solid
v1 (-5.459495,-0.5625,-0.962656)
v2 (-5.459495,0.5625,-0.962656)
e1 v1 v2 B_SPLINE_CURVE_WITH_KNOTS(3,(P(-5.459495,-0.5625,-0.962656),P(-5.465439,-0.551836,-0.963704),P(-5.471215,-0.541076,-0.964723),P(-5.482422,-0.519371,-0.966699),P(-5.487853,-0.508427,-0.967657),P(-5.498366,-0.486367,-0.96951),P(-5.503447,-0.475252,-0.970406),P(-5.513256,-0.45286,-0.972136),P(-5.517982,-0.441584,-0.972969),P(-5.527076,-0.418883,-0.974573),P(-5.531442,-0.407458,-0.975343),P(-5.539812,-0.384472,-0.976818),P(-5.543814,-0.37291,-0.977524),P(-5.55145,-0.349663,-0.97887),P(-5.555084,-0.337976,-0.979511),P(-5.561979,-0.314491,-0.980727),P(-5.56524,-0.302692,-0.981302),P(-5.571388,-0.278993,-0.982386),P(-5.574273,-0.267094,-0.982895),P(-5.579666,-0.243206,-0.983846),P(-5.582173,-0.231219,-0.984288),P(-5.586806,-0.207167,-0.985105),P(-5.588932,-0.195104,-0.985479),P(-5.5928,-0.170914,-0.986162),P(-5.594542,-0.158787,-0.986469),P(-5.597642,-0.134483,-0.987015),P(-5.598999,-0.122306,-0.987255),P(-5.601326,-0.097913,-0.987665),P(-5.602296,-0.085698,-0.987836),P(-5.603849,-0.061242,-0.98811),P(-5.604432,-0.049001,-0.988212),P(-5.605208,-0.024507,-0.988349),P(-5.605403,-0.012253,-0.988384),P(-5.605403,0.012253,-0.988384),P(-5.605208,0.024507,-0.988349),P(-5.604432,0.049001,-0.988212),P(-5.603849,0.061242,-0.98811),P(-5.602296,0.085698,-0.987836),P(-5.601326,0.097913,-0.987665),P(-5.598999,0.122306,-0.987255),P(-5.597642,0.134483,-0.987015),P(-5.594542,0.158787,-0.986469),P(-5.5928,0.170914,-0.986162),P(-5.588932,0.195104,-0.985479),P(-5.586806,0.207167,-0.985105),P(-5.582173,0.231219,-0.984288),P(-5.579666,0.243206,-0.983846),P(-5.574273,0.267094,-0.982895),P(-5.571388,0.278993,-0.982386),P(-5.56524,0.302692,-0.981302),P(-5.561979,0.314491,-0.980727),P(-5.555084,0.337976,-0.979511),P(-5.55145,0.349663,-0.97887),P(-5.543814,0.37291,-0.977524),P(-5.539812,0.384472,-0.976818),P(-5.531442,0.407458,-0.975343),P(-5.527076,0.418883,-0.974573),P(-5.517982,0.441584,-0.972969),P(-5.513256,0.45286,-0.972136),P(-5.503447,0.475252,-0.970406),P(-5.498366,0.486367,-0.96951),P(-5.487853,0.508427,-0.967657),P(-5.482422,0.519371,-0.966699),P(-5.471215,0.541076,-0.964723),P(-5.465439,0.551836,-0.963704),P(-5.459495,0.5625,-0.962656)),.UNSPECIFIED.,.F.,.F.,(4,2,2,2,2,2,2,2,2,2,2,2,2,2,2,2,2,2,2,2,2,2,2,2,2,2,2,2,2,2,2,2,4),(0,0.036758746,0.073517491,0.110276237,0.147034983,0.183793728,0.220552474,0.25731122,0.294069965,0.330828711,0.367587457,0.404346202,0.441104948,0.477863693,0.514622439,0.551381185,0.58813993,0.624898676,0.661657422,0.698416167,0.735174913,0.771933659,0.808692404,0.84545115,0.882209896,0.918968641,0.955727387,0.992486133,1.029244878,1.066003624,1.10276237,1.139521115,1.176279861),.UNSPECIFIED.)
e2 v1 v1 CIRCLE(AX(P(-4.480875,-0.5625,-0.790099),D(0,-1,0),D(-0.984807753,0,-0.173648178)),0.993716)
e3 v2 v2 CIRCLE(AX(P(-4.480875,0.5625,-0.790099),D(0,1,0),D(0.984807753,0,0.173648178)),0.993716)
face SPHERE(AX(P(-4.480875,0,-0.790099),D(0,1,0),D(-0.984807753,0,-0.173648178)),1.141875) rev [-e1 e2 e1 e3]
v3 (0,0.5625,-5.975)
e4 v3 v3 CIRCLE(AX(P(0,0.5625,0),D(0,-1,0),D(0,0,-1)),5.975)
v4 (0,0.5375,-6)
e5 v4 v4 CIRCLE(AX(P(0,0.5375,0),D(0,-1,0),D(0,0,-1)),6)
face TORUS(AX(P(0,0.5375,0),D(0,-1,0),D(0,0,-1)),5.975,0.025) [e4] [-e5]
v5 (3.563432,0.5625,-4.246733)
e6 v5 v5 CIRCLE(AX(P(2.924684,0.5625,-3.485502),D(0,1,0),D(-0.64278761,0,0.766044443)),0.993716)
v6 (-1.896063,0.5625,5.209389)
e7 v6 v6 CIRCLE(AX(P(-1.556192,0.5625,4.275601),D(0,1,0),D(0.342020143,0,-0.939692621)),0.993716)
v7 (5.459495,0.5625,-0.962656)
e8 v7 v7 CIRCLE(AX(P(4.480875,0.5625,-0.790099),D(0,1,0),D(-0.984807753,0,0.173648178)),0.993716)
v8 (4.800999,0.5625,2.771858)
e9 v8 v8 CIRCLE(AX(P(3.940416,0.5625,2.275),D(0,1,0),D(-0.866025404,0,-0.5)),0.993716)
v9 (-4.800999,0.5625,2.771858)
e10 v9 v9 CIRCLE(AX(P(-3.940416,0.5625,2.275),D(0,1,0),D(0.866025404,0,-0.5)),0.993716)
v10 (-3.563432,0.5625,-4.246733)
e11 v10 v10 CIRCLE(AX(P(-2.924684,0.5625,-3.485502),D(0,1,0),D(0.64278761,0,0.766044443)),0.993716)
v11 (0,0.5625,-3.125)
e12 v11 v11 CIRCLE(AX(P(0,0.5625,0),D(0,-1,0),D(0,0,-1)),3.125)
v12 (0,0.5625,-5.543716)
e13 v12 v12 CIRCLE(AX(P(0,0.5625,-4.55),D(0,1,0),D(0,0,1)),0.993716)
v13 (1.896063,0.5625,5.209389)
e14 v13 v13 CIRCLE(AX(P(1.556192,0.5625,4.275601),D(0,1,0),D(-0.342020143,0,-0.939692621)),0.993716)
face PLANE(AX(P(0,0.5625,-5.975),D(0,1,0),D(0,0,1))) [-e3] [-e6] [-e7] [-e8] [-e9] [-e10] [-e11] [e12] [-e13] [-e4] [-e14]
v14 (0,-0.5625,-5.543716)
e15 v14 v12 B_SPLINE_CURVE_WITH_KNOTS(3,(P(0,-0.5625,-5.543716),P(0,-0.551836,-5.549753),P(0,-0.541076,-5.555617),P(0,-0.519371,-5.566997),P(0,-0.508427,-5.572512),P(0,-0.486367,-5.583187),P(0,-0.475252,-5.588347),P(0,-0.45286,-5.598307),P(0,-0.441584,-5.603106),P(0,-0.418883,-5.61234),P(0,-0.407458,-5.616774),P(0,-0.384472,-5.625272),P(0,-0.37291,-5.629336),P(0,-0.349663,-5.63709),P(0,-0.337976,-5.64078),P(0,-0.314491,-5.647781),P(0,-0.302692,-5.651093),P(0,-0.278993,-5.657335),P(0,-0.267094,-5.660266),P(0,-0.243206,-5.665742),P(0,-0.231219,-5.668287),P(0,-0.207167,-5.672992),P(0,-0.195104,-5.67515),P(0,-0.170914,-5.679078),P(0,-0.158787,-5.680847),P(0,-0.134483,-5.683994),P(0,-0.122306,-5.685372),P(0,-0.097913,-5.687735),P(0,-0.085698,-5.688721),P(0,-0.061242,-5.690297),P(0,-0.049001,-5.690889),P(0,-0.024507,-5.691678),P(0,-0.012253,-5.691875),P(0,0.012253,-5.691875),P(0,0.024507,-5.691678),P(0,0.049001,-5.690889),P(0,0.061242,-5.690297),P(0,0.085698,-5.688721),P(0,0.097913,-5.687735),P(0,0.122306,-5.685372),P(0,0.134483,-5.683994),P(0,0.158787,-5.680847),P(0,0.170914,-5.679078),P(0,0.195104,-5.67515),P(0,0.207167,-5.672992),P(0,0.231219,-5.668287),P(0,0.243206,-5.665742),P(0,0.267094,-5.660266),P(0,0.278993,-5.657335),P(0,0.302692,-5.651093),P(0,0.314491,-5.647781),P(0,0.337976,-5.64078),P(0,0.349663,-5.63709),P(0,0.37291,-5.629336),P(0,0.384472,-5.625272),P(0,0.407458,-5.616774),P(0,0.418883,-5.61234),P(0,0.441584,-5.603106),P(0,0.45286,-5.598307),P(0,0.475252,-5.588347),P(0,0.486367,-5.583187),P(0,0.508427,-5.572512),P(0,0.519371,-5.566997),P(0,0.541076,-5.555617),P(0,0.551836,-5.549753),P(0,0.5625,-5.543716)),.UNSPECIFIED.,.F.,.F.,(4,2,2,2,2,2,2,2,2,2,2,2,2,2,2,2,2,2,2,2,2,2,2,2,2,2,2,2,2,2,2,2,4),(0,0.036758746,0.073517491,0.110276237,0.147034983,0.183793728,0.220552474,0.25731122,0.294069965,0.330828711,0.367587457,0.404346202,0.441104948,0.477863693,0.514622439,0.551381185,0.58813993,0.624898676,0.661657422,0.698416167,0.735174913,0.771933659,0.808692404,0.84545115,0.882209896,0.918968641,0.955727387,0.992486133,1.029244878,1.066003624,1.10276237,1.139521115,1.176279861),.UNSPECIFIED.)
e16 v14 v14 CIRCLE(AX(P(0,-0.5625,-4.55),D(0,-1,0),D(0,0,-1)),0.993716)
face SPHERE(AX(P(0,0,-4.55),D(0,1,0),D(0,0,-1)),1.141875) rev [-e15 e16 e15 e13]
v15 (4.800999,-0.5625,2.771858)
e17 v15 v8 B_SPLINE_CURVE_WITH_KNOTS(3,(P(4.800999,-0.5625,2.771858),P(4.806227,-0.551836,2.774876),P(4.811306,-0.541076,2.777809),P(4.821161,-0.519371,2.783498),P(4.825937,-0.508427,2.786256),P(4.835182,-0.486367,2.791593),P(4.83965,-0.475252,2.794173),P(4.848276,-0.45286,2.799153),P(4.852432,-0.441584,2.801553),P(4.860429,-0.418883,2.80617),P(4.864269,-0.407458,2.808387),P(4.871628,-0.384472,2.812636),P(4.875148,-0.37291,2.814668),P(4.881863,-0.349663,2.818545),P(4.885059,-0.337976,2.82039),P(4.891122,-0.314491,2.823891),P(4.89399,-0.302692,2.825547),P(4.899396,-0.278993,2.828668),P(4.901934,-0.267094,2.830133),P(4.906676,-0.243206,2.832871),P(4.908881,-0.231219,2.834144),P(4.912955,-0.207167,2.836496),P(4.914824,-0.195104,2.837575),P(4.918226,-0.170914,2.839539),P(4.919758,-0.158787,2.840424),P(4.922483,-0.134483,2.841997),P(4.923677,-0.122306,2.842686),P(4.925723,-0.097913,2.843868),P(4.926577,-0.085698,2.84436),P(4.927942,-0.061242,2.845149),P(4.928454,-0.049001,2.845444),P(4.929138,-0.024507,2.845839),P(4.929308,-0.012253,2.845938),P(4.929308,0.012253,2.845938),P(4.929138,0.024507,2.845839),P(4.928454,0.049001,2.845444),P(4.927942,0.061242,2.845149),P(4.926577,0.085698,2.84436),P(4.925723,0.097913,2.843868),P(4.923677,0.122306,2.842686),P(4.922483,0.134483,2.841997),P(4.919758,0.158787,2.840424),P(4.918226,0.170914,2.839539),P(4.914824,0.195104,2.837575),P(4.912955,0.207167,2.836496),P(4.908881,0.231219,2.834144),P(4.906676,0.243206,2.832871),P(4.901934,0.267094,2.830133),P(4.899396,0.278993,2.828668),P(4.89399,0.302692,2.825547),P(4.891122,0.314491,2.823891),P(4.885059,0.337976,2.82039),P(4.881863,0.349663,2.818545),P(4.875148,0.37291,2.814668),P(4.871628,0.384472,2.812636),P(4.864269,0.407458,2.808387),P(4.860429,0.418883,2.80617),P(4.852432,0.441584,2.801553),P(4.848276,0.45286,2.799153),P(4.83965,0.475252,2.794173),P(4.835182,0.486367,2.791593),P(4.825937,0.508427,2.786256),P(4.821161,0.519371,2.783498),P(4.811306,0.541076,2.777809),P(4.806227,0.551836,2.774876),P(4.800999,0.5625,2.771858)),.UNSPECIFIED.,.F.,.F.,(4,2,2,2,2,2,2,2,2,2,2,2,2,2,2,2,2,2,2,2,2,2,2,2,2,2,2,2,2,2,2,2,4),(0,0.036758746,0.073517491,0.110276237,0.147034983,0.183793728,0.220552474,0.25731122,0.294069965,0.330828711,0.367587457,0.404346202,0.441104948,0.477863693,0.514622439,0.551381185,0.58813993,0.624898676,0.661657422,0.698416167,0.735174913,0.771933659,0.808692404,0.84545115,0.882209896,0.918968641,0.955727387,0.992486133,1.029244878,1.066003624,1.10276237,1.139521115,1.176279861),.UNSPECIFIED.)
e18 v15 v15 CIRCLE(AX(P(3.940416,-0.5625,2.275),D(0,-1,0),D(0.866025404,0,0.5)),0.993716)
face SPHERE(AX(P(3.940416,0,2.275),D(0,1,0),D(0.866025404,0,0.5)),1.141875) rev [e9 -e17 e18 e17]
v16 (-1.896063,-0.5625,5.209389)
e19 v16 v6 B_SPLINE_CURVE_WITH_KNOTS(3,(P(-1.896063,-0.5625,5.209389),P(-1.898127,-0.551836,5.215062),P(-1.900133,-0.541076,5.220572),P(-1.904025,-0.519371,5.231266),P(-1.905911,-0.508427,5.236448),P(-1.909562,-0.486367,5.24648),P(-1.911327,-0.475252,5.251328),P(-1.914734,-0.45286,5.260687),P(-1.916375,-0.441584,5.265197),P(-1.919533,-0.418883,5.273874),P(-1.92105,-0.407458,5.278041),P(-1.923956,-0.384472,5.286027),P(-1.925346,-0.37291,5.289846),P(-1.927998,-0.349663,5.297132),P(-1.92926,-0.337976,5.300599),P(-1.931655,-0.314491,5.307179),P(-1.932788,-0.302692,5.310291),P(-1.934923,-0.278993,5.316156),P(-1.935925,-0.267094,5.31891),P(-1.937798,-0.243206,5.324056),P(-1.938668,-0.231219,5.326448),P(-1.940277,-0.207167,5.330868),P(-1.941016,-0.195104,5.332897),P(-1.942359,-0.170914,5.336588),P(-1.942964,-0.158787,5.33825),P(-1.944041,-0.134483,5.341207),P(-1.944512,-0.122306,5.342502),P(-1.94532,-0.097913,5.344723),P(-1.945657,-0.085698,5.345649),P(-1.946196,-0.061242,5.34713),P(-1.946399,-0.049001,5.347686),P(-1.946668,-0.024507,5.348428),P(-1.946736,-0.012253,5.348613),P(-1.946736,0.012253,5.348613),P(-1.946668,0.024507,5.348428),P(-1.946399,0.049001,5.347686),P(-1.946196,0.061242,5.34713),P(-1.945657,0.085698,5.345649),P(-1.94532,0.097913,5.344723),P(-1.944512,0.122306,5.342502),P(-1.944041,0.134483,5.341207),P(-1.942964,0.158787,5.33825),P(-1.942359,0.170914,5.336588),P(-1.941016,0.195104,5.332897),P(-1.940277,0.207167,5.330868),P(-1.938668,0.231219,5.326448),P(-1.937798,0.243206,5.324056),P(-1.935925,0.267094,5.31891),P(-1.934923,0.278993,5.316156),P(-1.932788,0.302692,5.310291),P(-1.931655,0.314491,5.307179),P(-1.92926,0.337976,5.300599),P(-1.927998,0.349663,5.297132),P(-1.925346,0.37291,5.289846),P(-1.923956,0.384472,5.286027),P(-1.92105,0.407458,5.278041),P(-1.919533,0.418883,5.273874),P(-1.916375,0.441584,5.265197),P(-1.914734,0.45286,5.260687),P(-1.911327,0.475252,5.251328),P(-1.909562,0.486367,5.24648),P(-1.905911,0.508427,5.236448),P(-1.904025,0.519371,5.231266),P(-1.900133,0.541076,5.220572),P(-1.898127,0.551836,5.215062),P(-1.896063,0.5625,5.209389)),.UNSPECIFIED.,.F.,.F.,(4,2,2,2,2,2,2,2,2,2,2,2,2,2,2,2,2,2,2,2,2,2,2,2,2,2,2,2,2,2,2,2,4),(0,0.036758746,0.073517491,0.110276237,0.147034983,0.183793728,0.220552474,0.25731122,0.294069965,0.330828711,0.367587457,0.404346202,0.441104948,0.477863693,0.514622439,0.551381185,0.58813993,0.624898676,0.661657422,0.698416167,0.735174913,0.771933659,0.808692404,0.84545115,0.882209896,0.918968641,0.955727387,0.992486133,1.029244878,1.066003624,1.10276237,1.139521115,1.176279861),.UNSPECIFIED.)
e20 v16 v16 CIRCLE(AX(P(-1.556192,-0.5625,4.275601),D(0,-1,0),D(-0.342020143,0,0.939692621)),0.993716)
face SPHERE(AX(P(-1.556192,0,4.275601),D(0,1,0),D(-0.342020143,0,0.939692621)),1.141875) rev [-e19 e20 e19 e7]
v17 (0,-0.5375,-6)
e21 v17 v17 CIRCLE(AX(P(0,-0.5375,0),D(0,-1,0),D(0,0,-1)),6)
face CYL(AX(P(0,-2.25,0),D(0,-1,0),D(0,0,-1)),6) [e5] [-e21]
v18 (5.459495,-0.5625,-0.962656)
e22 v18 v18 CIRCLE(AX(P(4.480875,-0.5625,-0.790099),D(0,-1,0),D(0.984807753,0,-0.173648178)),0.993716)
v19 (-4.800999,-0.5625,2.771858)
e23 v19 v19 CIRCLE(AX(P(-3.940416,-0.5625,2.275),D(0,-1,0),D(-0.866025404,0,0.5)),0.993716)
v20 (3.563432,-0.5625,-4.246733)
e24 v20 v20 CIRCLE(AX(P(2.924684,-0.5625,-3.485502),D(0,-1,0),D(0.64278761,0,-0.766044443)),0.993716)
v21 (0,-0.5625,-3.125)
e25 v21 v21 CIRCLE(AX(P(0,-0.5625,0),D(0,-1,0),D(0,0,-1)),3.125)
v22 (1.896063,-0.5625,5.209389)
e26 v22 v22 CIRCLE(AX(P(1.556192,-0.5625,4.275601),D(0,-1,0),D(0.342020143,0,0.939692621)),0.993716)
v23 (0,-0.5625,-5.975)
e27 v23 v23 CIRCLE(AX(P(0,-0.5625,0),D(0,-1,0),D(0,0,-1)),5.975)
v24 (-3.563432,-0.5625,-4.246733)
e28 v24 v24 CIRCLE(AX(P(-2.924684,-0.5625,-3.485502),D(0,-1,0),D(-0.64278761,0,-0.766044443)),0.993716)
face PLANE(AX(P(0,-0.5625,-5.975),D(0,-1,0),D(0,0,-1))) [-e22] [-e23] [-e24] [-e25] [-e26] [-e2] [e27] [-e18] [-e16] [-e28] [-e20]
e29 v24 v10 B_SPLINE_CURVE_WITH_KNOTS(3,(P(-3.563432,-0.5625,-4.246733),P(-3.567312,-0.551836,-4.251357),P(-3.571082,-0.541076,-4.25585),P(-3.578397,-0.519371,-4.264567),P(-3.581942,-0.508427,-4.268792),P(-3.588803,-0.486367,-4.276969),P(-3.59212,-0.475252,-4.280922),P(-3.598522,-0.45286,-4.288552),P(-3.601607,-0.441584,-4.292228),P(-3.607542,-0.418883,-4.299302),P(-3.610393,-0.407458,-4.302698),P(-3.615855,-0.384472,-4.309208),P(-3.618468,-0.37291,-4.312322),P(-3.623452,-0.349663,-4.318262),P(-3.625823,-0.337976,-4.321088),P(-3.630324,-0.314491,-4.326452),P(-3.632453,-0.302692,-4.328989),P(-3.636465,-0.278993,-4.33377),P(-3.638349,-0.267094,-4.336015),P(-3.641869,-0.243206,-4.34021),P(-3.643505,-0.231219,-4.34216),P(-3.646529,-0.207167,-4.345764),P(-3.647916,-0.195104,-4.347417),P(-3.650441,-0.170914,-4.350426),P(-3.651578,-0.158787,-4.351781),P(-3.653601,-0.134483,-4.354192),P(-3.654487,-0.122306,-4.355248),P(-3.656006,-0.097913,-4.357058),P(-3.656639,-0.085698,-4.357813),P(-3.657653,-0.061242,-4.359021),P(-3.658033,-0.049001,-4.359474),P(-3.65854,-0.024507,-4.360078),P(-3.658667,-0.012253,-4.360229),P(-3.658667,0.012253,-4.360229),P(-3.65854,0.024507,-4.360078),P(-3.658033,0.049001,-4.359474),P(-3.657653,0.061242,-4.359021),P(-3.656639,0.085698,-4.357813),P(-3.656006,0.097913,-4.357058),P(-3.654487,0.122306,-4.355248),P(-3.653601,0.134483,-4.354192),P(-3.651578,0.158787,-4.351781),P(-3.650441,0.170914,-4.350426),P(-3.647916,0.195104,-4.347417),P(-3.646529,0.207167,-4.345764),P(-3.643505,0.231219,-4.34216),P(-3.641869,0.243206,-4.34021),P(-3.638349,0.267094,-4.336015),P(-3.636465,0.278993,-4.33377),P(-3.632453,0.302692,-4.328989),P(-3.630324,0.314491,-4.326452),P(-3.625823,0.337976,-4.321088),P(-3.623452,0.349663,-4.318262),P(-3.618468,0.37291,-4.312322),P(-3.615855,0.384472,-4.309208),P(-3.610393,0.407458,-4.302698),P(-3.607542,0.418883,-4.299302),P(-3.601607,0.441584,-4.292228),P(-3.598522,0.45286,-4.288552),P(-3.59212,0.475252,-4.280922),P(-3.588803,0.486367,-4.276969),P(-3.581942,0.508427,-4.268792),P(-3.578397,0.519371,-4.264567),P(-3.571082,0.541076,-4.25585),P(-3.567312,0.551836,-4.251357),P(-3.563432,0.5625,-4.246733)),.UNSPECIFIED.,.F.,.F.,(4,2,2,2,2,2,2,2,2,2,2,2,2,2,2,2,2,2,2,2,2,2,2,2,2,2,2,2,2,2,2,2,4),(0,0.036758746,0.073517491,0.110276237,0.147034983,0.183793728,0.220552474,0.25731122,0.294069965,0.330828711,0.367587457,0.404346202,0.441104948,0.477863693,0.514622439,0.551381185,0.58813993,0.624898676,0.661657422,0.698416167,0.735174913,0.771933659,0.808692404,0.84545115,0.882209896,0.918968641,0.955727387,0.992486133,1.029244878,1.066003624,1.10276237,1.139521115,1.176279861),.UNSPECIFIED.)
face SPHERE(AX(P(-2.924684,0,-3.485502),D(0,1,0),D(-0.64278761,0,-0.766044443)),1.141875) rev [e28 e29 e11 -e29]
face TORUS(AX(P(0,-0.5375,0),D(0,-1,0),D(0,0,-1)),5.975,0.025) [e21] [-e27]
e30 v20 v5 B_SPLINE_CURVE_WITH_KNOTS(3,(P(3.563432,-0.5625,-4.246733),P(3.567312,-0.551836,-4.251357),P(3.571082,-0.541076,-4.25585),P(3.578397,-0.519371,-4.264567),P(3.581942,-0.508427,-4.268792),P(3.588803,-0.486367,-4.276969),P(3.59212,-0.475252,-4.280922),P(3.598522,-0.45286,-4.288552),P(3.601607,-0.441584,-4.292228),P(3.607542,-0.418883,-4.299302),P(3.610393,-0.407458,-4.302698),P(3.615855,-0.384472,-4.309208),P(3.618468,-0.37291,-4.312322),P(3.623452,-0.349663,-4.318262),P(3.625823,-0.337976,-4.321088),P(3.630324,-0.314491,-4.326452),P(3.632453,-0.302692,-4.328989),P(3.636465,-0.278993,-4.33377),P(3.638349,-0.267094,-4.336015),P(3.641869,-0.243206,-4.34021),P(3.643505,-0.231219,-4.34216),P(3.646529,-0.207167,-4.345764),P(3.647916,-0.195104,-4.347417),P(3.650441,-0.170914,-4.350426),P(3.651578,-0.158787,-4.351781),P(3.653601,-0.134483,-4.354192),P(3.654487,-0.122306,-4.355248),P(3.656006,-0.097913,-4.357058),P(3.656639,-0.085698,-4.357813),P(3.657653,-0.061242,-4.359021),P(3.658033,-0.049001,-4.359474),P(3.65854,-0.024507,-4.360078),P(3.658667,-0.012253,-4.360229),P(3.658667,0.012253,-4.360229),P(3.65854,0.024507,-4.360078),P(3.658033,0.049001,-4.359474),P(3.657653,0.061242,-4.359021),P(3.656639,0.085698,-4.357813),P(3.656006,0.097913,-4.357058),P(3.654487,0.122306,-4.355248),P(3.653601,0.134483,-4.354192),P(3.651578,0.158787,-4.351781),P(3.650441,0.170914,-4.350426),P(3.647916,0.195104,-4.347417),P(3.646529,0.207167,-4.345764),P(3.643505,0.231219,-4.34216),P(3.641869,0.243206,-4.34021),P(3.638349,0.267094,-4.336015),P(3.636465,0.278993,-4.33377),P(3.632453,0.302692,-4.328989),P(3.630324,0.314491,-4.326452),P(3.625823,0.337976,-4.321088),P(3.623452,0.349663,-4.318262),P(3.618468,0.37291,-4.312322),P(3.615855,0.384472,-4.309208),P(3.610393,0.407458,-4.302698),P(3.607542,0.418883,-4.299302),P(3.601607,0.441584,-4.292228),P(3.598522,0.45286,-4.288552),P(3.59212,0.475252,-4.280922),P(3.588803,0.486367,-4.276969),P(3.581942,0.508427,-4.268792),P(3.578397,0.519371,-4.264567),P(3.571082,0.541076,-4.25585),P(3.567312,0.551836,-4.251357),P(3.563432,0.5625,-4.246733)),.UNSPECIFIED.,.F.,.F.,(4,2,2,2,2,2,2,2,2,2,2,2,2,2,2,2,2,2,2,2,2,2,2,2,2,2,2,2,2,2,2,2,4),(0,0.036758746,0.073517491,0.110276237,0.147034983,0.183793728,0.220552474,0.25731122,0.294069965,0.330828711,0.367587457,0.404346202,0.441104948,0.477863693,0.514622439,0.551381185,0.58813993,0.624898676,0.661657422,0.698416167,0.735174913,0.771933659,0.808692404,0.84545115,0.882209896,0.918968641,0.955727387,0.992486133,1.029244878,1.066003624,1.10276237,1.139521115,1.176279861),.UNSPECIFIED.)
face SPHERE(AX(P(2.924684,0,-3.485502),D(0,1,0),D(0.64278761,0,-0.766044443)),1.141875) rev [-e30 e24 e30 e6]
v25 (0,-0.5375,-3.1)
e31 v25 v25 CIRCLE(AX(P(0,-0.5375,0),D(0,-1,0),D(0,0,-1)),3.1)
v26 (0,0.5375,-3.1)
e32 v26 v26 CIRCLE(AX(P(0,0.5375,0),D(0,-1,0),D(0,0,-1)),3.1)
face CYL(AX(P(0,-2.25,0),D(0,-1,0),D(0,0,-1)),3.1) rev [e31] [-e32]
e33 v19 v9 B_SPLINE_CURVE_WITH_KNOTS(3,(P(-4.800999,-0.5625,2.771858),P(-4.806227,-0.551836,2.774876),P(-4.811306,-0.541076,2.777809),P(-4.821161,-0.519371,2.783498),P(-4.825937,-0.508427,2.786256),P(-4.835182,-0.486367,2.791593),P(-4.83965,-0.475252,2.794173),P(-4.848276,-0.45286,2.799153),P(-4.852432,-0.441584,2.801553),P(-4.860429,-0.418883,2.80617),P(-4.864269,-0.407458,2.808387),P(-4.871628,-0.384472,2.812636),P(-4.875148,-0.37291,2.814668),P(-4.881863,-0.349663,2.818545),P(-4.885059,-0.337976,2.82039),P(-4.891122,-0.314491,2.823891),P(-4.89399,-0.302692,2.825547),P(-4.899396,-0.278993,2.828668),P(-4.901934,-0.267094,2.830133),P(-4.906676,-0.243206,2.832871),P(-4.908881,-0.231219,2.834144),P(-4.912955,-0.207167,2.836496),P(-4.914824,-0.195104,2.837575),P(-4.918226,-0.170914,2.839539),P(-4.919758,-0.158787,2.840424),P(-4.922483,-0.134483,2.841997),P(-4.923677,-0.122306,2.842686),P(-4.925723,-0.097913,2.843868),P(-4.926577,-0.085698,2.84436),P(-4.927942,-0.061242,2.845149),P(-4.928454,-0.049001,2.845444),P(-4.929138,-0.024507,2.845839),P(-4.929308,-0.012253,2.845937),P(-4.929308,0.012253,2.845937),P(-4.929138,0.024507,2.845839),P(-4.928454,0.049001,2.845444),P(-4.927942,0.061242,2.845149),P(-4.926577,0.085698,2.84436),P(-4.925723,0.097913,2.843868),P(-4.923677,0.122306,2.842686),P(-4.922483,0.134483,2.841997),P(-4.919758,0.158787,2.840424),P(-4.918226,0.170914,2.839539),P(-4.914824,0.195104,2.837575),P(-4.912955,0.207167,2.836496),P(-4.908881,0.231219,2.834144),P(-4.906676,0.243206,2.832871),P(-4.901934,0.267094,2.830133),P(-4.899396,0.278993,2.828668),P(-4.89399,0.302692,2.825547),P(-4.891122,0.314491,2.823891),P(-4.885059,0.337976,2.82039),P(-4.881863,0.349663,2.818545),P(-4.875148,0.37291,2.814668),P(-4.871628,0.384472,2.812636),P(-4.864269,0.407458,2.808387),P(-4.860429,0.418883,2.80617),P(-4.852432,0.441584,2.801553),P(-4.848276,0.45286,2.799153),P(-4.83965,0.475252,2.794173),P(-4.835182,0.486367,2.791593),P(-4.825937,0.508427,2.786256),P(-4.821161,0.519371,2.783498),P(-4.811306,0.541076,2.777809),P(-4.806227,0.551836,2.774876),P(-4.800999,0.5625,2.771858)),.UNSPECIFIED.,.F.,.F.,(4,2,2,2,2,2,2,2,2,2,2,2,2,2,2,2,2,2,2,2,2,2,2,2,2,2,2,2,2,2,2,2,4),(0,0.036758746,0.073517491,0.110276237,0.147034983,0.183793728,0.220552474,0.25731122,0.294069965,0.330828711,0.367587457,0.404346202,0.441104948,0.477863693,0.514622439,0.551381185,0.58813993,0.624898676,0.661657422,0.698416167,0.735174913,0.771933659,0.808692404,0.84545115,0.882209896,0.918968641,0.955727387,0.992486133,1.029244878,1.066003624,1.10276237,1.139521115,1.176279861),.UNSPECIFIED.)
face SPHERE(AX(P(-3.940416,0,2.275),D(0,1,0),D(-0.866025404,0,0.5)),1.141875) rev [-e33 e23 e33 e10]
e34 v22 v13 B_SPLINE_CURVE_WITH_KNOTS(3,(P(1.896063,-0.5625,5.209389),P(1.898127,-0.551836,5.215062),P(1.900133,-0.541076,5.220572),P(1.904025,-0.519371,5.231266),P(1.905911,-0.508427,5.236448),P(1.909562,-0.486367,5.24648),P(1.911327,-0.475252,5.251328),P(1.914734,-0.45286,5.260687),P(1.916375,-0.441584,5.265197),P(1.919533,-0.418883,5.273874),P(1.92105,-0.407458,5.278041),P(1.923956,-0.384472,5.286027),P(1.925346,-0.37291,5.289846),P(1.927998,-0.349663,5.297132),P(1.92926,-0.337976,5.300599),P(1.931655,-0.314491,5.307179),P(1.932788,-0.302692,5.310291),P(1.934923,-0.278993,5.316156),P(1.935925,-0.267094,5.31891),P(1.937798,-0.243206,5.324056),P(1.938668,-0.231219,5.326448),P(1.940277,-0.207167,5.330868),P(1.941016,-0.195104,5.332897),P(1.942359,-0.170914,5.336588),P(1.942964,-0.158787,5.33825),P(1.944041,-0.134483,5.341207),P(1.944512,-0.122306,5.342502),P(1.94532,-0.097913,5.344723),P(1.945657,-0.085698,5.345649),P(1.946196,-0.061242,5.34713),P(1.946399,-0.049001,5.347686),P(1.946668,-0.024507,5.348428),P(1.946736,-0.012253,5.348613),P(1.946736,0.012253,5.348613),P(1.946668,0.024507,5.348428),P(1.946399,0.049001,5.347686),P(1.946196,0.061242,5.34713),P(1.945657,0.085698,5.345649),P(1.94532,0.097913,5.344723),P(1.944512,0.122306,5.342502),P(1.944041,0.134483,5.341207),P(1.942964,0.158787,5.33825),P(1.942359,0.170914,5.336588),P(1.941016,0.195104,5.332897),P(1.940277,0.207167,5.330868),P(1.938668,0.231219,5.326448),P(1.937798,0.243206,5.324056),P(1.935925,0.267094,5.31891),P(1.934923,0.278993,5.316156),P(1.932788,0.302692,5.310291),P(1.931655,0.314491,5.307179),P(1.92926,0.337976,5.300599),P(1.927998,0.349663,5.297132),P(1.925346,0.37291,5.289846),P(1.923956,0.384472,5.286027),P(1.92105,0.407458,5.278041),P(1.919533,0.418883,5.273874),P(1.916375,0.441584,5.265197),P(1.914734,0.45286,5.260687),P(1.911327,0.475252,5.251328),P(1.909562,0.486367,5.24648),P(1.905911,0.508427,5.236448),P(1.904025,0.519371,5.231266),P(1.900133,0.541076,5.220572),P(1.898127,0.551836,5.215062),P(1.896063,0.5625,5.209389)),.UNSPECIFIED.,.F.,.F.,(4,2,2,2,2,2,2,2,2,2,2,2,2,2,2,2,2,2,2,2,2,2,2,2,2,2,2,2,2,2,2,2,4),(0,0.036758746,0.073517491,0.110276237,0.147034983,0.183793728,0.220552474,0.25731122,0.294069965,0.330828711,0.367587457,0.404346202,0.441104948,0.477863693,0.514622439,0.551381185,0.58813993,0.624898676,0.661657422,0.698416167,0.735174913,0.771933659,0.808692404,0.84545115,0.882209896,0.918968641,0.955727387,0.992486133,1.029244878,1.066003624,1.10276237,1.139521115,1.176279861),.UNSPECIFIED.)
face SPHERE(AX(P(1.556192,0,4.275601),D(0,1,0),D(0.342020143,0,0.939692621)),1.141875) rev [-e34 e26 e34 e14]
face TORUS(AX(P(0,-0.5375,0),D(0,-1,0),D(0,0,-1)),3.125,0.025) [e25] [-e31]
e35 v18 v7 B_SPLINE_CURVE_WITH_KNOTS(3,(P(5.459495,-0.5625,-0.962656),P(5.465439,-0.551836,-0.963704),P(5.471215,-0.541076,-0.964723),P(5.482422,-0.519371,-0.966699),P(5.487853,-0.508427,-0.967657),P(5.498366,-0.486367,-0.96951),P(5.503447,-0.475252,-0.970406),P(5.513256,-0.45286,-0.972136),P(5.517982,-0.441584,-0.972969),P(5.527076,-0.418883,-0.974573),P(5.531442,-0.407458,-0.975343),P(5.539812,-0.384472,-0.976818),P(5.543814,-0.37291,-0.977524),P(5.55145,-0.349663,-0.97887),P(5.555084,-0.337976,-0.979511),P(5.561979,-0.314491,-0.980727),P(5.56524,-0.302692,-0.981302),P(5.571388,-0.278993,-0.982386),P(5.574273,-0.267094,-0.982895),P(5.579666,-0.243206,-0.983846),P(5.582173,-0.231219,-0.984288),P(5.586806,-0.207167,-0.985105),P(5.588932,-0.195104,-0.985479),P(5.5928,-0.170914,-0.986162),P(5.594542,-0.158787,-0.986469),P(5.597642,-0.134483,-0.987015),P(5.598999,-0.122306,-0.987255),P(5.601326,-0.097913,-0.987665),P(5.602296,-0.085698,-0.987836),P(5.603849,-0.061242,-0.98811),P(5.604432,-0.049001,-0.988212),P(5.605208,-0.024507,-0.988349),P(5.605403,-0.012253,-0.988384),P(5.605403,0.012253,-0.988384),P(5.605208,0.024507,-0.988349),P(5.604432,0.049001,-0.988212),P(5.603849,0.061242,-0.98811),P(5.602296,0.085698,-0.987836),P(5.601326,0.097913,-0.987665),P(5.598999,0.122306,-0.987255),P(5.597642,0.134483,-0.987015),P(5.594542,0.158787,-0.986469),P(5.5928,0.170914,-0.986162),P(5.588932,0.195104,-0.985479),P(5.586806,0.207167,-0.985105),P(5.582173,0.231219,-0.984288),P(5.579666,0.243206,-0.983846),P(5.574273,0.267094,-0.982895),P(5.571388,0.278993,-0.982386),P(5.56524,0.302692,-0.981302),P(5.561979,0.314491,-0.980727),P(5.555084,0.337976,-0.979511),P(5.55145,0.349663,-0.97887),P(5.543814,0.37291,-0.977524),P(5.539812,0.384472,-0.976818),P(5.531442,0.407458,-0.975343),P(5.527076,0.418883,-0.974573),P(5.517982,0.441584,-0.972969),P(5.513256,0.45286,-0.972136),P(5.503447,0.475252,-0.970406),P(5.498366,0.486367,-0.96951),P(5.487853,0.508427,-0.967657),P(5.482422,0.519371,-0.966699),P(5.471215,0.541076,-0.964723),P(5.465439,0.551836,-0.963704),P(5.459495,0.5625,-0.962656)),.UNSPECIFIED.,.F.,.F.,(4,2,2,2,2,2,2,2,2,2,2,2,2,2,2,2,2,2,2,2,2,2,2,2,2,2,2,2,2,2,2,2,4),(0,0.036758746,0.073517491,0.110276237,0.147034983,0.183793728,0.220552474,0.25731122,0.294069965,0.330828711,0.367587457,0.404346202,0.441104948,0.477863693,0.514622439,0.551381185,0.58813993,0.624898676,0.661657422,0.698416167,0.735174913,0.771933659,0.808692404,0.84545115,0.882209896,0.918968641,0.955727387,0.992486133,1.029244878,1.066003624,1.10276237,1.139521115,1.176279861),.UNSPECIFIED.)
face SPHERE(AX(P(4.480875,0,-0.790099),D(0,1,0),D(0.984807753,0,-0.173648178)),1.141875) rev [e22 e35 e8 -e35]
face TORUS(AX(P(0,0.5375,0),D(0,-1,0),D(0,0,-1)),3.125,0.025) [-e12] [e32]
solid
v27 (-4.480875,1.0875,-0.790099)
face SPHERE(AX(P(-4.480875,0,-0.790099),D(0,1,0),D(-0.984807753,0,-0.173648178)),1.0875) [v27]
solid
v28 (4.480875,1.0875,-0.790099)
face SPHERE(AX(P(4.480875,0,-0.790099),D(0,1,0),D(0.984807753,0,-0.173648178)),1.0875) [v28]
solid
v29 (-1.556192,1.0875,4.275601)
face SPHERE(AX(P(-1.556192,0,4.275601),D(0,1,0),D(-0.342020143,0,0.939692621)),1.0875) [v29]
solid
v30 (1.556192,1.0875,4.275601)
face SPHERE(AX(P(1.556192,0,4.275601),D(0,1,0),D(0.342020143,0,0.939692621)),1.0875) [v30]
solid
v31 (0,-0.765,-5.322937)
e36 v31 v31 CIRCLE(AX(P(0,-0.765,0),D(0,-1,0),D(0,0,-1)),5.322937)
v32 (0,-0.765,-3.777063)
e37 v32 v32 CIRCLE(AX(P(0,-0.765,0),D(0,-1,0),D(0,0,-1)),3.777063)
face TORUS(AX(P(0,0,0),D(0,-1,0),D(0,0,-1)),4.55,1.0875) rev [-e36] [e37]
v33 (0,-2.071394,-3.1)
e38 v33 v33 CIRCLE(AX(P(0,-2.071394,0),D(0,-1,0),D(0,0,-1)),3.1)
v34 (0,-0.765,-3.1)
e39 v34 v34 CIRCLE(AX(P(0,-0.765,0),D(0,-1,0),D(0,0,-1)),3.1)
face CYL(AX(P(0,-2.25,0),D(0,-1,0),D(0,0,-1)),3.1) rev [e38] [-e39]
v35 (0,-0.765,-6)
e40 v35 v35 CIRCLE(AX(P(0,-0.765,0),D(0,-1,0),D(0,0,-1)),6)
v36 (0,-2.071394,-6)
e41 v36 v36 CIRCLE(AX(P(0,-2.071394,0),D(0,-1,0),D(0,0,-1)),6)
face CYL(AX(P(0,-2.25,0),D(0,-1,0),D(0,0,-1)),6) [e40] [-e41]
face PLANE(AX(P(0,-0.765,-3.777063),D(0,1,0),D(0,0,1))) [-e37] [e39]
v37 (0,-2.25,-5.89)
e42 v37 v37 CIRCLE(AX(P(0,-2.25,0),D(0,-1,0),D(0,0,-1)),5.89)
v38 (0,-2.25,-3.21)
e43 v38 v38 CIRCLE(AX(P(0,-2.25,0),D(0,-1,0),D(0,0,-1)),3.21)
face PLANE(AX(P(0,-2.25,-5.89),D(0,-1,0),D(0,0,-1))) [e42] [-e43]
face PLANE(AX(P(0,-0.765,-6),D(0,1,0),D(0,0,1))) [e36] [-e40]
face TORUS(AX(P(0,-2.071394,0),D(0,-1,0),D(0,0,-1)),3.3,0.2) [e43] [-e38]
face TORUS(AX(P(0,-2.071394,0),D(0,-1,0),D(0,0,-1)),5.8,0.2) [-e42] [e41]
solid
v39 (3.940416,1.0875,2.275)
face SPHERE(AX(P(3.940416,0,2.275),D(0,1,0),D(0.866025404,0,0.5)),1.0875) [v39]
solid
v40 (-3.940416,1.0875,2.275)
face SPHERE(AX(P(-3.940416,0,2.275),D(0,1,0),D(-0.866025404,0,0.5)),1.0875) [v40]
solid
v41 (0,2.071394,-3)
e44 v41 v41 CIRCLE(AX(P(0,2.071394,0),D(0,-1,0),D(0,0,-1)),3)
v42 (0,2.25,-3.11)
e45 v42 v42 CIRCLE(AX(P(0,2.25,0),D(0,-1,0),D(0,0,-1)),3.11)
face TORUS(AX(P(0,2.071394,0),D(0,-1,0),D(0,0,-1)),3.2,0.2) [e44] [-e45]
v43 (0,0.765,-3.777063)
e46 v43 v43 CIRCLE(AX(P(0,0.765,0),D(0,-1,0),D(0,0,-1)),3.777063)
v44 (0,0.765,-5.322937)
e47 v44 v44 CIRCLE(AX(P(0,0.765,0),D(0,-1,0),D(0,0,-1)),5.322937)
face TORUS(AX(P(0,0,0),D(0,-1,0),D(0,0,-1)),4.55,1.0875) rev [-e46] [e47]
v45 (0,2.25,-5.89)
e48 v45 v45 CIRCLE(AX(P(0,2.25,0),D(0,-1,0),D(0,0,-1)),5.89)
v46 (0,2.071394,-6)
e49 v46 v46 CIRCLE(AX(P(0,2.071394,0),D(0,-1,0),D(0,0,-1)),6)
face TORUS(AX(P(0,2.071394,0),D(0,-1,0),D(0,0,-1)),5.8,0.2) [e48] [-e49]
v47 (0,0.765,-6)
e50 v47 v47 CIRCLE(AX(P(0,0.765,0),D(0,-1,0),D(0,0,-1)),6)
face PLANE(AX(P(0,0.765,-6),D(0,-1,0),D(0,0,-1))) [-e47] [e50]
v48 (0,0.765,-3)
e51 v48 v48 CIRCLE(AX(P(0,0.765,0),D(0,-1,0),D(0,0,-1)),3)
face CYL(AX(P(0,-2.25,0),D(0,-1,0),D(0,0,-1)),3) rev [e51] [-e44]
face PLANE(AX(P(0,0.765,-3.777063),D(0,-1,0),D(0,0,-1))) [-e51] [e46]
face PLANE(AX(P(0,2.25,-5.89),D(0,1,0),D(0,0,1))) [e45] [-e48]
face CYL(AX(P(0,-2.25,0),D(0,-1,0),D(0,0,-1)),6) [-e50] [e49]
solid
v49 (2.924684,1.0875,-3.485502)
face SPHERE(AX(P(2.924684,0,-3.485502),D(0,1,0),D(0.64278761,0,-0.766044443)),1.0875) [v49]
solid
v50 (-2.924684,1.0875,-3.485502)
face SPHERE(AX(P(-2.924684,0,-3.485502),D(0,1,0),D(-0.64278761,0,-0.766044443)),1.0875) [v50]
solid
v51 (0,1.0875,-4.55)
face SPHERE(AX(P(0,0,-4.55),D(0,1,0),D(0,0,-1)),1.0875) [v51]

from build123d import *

# Parameters (mm, degrees)
CIRPATTERN1_COUNT = 9
CIRPATTERN2_COUNT = 9


# Read off the part's stored shape, not the designer's step: Cut-Revolve1
with BuildPart() as part:
    # Sketch3 → Revolve1 (revolve)
    with BuildSketch(Plane(origin=(0, 0, 0), x_dir=(0, 0, -1), z_dir=(1, 0, 0))):
        with BuildLine():
            Line((6, 0.765), (5.32293677, 0.765))
            ThreePointArc((5.32293677, 0.765), (4.55, 1.0875), (3.77706323, 0.765))
            Line((3.77706323, 0.765), (3, 0.765))
            Line((3, 0.765), (3, 2.071394289))
            ThreePointArc((3, 2.071394289), (3.029706136, 2.176275174), (3.11, 2.25))
            Line((3.11, 2.25), (5.89, 2.25))
            ThreePointArc((5.89, 2.25), (5.970293864, 2.176275174), (6, 2.071394289))
            Line((6, 2.071394289), (6, 0.765))
        make_face()
        with BuildLine():
            Line((3.77706323, -0.765), (3.1, -0.765))
            Line((3.1, -0.765), (3.1, -2.071394289))
            ThreePointArc((3.1, -2.071394289), (3.129706136, -2.176275174), (3.21, -2.25))
            Line((3.21, -2.25), (5.89, -2.25))
            ThreePointArc((5.89, -2.25), (5.970293864, -2.176275174), (6, -2.071394289))
            Line((6, -2.071394289), (6, -0.765))
            Line((6, -0.765), (5.32293677, -0.765))
            ThreePointArc((5.32293677, -0.765), (4.55, -1.0875), (3.77706323, -0.765))
        make_face()
        with BuildLine():
            Line((5.975, 0.5625), (3.125, 0.5625))
            ThreePointArc((3.125, 0.5625), (3.10732233, 0.55517767), (3.1, 0.5375))
            Line((3.1, 0.5375), (3.1, -0.5375))
            ThreePointArc((3.1, -0.5375), (3.10732233, -0.55517767), (3.125, -0.5625))
            Line((3.125, -0.5625), (5.975, -0.5625))
            ThreePointArc((5.975, -0.5625), (5.99267767, -0.55517767), (6, -0.5375))
            Line((6, -0.5375), (6, 0.5375))
            ThreePointArc((6, 0.5375), (5.99267767, 0.55517767), (5.975, 0.5625))
        make_face()
    revolve(axis=Axis((0, -2.25, 0), (0, 1, 0)))

    # Cut-Revolve1 outline → Cut-Revolve1 (revolve, cut)
    with BuildSketch(Plane.XY.offset(-4.55)):
        with BuildLine():
            Line((0.99371639, 0.562500001), (0, 0.562500001))
            Line((0, 0.562500001), (0, -0.562500001))
            Line((0, -0.562500001), (0.99371639, -0.562500001))
            ThreePointArc((0.99371639, -0.562500001), (1.141875, 0), (0.99371639, 0.562500001))
        make_face()
    cut_revolve1 = revolve(axis=Axis((0, 0, -4.55), (0, 1, 0)), mode=Mode.SUBTRACT)

    # CirPattern2: Cut-Revolve1 ×9 about axis
    cirpattern2_axis = Axis((0, 0, 0), (0, 1, 0))
    for i in range(1, CIRPATTERN2_COUNT):
        add(cut_revolve1.rotate(cirpattern2_axis, i * 360 / CIRPATTERN2_COUNT), mode=Mode.SUBTRACT)


with BuildPart() as body_2:
    # Sketch4 → Revolve2 (revolve)
    with BuildSketch(Plane(origin=(0, 0, 0), x_dir=(0, 0, -1), z_dir=(1, 0, 0))):
        with BuildLine():
            Line((4.55, -1.0875), (4.55, 1.0875))
            ThreePointArc((4.55, 1.0875), (3.4625, 0), (4.55, -1.0875))
        make_face()
    revolve(axis=Axis((0, 2.25, -4.55), (0, -1, 0)))


with BuildPart() as cirpattern1_1:
    # CirPattern1: pattern copy
    add(body_2.part.rotate(Axis((0, 0, 0), (0, 1, 0)), 1 * 360 / CIRPATTERN1_COUNT))


with BuildPart() as cirpattern1_2:
    # CirPattern1: pattern copy
    add(body_2.part.rotate(Axis((0, 0, 0), (0, 1, 0)), 2 * 360 / CIRPATTERN1_COUNT))


with BuildPart() as cirpattern1_3:
    # CirPattern1: pattern copy
    add(body_2.part.rotate(Axis((0, 0, 0), (0, 1, 0)), 3 * 360 / CIRPATTERN1_COUNT))


with BuildPart() as cirpattern1_4:
    # CirPattern1: pattern copy
    add(body_2.part.rotate(Axis((0, 0, 0), (0, 1, 0)), 4 * 360 / CIRPATTERN1_COUNT))


with BuildPart() as cirpattern1_5:
    # CirPattern1: pattern copy
    add(body_2.part.rotate(Axis((0, 0, 0), (0, 1, 0)), 5 * 360 / CIRPATTERN1_COUNT))


with BuildPart() as cirpattern1_6:
    # CirPattern1: pattern copy
    add(body_2.part.rotate(Axis((0, 0, 0), (0, 1, 0)), 6 * 360 / CIRPATTERN1_COUNT))


with BuildPart() as cirpattern1_7:
    # CirPattern1: pattern copy
    add(body_2.part.rotate(Axis((0, 0, 0), (0, 1, 0)), 7 * 360 / CIRPATTERN1_COUNT))


with BuildPart() as cirpattern1_8:
    # CirPattern1: pattern copy
    add(body_2.part.rotate(Axis((0, 0, 0), (0, 1, 0)), 8 * 360 / CIRPATTERN1_COUNT))


solid = Compound([part.part, body_2.part, cirpattern1_1.part, cirpattern1_2.part, cirpattern1_3.part, cirpattern1_4.part, cirpattern1_5.part, cirpattern1_6.part, cirpattern1_7.part, cirpattern1_8.part])
